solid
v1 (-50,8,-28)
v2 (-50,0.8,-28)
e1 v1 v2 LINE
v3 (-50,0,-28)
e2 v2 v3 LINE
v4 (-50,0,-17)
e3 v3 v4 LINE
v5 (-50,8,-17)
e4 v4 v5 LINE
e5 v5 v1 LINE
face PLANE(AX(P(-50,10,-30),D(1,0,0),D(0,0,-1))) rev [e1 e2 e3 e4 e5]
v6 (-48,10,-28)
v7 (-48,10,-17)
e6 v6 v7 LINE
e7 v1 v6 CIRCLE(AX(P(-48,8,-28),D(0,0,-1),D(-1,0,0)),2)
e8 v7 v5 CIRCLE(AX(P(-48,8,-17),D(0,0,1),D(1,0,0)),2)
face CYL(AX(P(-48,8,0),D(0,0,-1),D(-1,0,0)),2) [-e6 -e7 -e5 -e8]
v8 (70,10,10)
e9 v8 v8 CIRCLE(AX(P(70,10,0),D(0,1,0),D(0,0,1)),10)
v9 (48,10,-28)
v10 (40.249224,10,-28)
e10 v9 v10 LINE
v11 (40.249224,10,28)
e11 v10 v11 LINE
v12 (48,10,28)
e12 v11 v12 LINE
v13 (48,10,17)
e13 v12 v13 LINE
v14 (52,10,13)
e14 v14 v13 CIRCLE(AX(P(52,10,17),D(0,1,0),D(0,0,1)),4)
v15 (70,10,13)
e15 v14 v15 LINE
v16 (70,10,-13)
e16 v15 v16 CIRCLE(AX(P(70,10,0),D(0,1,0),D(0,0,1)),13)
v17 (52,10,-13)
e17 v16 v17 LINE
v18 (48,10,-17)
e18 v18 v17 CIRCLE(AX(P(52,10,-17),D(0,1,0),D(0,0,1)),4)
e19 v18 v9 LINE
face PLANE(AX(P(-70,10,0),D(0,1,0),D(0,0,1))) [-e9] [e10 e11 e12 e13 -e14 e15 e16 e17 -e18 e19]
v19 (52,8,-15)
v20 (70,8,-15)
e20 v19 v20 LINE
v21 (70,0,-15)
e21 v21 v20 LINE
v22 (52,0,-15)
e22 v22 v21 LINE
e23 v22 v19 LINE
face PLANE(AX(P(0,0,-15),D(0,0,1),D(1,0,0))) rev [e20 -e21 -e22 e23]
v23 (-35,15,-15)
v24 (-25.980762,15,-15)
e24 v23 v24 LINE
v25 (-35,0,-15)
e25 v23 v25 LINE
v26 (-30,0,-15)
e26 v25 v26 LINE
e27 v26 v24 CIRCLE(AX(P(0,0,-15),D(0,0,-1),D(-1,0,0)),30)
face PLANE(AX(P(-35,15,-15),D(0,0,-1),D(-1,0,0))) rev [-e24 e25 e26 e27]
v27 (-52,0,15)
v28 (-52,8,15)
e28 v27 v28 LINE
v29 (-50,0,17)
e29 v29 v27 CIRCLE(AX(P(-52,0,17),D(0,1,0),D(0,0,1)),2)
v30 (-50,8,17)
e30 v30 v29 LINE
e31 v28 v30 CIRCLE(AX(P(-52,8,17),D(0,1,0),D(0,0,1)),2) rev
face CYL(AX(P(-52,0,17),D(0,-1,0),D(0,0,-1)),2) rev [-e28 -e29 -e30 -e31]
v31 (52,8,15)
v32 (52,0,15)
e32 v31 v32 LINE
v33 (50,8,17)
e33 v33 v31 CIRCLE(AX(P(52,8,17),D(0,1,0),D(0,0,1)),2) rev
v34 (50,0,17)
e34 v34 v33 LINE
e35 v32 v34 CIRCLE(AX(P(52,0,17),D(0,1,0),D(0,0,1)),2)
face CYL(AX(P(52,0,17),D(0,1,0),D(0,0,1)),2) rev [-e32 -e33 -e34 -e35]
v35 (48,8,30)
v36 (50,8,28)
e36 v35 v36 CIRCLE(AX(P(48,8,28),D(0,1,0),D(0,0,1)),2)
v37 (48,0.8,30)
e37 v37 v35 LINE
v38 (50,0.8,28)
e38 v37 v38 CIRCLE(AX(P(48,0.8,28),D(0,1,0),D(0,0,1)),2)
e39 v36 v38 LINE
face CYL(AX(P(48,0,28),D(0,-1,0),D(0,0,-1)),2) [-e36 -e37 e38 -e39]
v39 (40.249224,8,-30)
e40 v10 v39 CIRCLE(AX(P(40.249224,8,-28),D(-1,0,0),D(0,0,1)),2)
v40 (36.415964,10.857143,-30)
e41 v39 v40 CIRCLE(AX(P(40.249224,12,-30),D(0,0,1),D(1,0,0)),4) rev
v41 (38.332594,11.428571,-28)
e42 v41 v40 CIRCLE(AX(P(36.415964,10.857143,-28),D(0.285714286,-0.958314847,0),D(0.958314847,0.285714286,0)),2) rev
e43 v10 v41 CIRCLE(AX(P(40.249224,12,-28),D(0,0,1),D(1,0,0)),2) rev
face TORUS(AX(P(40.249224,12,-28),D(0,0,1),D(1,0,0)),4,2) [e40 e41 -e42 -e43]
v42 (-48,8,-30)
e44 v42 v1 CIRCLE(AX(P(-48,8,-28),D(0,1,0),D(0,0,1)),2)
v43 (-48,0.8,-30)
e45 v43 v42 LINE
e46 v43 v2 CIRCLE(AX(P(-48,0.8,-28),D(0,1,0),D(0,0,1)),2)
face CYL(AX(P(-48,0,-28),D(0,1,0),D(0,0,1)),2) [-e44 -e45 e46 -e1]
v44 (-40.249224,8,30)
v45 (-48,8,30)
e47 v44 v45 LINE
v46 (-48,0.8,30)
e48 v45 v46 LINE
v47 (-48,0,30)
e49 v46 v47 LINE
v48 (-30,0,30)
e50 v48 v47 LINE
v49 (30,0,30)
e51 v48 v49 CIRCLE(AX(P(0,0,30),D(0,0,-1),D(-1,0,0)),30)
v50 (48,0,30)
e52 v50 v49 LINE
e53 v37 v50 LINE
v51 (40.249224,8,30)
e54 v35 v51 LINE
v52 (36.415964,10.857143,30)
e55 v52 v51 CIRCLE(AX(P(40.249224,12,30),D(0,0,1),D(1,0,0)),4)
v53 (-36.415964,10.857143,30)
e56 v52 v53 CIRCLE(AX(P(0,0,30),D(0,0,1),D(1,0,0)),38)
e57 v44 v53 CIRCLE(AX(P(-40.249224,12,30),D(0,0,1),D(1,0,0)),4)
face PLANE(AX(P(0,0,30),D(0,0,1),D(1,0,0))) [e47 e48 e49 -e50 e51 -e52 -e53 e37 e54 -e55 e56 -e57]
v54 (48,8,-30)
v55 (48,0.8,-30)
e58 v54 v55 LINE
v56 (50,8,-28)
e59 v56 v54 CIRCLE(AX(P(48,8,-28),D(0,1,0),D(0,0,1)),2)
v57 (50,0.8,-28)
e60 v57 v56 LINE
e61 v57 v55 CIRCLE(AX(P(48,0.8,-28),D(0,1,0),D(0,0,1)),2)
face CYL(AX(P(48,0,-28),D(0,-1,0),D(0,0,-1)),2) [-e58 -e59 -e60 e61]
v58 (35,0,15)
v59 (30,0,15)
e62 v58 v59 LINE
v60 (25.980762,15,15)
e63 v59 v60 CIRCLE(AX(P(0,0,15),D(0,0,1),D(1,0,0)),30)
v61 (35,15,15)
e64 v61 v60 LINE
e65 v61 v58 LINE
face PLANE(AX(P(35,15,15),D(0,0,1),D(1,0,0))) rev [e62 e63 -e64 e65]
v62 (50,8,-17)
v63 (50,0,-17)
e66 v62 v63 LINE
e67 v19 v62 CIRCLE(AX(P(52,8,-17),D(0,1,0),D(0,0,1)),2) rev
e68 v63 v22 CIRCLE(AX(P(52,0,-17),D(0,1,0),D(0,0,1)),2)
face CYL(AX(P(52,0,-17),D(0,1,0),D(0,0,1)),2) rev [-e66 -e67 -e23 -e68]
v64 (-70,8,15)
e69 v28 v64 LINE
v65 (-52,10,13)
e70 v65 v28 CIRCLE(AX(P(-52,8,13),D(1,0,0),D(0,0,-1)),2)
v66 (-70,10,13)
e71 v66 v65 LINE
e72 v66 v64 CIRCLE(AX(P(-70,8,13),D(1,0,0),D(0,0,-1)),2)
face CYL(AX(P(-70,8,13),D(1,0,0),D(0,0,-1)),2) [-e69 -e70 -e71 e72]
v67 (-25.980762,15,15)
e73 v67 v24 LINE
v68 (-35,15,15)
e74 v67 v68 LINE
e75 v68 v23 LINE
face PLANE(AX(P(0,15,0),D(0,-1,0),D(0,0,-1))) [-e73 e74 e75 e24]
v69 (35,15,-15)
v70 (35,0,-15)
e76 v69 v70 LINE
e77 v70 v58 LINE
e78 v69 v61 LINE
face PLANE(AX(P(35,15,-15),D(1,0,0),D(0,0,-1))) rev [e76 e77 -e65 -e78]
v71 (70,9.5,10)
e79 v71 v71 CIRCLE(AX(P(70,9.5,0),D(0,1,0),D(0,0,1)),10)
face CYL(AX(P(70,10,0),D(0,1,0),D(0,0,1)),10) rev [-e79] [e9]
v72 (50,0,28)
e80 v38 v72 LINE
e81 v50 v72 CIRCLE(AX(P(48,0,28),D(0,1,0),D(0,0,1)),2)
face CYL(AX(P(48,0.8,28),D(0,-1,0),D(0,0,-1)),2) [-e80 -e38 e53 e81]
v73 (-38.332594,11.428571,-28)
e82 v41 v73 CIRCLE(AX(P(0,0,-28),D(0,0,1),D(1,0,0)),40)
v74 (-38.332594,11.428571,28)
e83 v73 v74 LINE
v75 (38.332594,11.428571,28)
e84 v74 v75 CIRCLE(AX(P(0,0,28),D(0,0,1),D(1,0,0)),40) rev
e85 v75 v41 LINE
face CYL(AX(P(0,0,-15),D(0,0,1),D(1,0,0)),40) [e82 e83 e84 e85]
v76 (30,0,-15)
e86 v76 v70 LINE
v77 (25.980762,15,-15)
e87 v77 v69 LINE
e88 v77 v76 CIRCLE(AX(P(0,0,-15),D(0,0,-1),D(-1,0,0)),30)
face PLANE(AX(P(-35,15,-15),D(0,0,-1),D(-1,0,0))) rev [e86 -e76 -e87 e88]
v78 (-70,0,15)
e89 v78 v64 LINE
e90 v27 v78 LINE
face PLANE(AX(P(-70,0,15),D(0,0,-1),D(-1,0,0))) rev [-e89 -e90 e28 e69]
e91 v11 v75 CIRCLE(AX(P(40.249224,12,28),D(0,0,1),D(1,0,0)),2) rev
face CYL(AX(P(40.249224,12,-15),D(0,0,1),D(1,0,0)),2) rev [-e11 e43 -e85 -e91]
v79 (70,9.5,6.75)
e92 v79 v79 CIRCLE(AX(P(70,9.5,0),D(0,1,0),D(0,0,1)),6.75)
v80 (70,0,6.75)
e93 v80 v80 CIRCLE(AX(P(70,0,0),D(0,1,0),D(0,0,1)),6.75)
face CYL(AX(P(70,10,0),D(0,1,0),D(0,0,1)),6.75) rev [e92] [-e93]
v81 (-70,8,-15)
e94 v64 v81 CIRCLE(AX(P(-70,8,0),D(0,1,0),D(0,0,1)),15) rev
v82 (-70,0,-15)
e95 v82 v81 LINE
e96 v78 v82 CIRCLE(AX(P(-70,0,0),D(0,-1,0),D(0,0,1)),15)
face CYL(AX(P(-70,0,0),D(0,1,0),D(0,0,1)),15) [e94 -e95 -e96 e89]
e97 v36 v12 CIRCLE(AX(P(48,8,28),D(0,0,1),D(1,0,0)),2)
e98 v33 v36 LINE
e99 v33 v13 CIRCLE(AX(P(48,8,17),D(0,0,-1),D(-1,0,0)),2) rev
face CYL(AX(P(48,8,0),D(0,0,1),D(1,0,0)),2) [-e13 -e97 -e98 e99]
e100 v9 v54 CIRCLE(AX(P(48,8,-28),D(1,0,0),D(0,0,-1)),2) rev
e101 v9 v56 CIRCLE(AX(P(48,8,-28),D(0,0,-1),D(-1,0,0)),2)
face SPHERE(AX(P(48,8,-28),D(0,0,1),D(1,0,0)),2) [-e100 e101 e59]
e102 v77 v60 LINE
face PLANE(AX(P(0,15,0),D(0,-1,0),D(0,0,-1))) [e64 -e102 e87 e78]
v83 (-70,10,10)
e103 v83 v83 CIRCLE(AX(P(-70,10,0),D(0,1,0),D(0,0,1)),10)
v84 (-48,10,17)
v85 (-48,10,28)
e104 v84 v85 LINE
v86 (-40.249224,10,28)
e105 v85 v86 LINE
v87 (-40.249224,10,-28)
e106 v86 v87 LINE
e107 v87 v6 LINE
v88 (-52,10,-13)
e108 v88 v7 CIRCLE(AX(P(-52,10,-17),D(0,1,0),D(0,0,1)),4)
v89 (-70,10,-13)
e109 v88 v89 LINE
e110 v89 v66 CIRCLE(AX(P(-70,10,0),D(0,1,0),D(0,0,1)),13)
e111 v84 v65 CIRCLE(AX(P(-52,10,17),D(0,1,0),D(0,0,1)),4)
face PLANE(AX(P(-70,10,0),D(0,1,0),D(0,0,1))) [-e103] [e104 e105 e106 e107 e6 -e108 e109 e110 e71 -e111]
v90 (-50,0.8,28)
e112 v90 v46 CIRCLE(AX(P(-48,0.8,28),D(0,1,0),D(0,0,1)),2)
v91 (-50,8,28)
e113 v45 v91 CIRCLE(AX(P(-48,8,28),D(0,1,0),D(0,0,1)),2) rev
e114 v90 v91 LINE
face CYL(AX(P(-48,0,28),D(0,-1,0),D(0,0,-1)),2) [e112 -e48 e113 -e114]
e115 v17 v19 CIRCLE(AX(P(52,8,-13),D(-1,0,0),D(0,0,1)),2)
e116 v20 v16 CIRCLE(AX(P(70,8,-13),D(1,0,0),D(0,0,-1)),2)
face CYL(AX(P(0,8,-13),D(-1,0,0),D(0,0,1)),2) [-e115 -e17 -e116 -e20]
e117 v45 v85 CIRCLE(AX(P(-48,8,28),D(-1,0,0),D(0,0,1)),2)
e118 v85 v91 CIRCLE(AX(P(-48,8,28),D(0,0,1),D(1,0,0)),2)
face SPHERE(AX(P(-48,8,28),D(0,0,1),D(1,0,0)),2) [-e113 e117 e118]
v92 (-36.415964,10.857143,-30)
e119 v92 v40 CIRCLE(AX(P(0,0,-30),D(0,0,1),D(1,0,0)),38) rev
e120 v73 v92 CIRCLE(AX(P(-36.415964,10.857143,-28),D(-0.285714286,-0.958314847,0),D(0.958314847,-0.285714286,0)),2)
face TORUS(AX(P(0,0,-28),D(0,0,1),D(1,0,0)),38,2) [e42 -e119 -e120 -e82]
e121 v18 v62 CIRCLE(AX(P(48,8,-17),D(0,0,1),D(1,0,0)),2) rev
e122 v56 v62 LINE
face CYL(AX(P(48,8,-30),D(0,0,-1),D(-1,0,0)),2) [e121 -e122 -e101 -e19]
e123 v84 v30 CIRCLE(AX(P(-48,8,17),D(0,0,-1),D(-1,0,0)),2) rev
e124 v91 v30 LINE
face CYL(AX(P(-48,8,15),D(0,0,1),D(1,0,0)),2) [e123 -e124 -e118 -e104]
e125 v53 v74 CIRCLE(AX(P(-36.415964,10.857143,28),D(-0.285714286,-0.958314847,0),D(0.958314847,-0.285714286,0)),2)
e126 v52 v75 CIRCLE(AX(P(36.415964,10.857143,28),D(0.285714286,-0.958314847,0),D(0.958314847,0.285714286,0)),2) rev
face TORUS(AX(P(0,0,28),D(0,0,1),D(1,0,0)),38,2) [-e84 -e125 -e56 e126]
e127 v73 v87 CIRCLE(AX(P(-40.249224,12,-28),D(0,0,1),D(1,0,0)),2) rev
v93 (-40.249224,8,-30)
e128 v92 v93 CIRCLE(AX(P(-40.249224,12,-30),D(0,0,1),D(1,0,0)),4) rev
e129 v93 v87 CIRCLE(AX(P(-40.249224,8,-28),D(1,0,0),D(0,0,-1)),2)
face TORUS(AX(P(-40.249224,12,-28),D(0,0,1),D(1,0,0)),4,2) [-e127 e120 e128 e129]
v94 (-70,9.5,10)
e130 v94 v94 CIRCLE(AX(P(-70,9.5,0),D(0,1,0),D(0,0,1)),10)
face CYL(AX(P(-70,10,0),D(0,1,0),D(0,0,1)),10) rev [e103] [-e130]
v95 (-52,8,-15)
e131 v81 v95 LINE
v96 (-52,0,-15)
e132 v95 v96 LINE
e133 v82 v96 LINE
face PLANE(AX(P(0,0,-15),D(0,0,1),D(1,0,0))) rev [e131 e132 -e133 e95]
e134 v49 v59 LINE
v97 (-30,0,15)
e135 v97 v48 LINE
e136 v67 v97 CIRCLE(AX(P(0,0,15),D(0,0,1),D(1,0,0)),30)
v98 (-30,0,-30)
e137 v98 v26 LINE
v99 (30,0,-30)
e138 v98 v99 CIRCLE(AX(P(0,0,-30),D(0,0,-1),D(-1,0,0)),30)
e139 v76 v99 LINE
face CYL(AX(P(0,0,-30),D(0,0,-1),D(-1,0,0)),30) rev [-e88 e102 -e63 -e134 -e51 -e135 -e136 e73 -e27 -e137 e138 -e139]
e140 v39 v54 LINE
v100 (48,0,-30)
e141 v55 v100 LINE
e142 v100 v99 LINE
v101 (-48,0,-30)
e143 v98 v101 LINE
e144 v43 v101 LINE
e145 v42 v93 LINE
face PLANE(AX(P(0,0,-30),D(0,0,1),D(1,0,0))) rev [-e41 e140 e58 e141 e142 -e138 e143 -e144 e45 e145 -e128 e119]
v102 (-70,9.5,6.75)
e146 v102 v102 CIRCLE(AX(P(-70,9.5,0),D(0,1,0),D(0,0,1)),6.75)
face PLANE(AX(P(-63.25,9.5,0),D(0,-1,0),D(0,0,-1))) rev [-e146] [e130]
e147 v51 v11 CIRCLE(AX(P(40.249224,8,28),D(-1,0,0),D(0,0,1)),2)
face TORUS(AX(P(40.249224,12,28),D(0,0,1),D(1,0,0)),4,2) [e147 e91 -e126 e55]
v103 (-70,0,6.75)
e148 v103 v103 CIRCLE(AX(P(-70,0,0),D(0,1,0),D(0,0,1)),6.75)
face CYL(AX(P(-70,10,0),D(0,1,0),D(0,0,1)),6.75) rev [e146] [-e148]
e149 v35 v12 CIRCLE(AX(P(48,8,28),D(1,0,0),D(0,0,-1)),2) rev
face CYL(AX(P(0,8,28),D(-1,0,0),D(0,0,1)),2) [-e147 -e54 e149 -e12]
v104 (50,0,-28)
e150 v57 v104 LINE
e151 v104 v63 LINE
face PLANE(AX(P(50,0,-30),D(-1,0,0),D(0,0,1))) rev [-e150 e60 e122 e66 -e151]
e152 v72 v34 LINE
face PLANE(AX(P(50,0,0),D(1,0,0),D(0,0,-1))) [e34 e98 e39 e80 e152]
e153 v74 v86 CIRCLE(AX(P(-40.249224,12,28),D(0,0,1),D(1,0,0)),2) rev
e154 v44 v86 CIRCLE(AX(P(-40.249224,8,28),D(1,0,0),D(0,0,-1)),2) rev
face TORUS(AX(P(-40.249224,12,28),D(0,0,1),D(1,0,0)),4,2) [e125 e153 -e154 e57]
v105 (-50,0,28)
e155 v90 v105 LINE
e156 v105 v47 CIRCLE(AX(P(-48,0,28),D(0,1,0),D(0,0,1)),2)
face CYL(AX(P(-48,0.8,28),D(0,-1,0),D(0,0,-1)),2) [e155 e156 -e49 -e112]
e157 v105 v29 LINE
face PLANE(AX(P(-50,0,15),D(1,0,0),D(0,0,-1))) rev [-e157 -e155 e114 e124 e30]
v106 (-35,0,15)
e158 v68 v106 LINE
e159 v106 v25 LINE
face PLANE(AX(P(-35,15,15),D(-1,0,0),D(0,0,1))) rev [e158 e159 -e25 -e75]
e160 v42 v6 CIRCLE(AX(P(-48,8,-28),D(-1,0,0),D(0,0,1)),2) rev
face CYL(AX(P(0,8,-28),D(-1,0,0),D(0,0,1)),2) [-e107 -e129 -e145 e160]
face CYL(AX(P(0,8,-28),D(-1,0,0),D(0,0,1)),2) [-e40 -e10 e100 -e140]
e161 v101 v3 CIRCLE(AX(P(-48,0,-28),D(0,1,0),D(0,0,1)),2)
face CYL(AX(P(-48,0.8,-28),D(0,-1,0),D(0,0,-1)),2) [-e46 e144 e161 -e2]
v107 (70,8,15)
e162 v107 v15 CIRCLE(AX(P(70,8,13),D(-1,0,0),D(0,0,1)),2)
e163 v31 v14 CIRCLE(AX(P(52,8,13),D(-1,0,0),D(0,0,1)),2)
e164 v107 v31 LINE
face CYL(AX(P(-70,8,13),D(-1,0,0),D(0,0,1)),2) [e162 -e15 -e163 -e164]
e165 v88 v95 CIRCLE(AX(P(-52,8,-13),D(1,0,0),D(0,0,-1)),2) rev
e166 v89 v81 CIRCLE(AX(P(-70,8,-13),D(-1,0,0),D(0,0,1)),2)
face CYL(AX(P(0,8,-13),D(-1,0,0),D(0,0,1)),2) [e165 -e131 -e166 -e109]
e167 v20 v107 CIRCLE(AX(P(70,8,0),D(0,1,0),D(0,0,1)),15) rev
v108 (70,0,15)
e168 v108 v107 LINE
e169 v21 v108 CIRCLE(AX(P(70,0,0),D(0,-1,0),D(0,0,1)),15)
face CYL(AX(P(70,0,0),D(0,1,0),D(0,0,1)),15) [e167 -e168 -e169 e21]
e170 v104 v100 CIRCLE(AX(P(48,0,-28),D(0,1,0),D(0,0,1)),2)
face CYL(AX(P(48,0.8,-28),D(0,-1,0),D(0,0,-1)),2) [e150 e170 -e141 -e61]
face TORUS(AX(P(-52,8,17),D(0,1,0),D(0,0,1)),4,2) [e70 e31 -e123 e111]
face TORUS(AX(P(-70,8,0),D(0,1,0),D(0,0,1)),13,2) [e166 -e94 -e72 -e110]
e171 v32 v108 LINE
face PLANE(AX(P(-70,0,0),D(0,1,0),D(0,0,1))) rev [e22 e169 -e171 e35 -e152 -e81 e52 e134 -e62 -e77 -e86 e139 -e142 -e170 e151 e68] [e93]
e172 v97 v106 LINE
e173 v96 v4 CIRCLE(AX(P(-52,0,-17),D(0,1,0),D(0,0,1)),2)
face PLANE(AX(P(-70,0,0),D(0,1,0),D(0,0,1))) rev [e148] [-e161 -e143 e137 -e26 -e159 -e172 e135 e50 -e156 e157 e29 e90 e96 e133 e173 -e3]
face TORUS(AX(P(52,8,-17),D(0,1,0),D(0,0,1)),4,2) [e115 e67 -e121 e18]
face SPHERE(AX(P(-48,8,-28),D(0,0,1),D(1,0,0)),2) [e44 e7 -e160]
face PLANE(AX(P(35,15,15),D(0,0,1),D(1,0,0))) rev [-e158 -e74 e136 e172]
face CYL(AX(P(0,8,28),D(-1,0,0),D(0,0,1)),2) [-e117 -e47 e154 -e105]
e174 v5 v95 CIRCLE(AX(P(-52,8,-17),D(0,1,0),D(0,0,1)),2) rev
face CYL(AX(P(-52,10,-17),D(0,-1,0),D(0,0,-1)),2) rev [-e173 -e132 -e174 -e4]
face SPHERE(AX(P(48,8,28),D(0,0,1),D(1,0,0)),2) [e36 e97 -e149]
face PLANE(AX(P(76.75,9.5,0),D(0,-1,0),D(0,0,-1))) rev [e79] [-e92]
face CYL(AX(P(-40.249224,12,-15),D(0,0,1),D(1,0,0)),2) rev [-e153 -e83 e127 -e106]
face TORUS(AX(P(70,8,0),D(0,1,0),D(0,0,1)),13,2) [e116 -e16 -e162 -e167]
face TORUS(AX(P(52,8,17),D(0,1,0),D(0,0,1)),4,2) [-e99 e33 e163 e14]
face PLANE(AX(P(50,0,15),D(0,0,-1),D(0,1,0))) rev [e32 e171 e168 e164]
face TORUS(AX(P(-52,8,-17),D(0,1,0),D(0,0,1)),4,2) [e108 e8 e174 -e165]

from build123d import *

# Parameters (mm, degrees)
EXTRUDE_1_DEPTH               = 45
EXTRUDE_2_DEPTH               = 10
SKETCH_3_W                    = 15
SKETCH_3_H                    = 10
CUT_EXTRUDE_1_DEPTH           = 20.000000002
EXTRUDE_3_DEPTH               = 15
CUT_EXTRUDE_2_DEPTH           = 0.8
CUT_EXTRUDE_3_DEPTH           = 0.8
CUT_EXTRUDE_4_DEPTH           = 0.8
CUT_EXTRUDE_5_DEPTH           = 0.8
SKETCH_9_W                    = 70.000000048
SKETCH_9_H                    = 30
CUT_EXTRUDE_6_DEPTH           = 15
HOLE_WIZARD_M52_1_D           = 60
HOLE_WIZARD_M12_1_D           = 13.5
HOLE_WIZARD_M12_1_CBORE_D     = 20
HOLE_WIZARD_M12_1_CBORE_DEPTH = 0.5
FILLET_1_R                    = 2


with BuildPart() as part:
    # 草图1 → 凸台-拉伸1 (new body)
    with BuildSketch(Plane.XY.offset(30)):
        with BuildLine():
            Line((-38.729833462, 10), (38.729833462, 10))
            ThreePointArc((38.729833462, 10), (0, 40), (-38.729833462, 10))
        make_face()
    extrude(amount=-EXTRUDE_1_DEPTH)

    # 草图2 → 凸台-拉伸2 (add)
    with BuildSketch(Plane.XZ.offset(-10)):
        with BuildLine():
            Line((-70, 15), (-50, 15))
            Line((-50, 15), (-50, 30))
            Line((-50, 30), (70, 30))
            Line((70, 30), (70, 15))
            ThreePointArc((70, 15), (85, 0), (70, -15))
            Line((70, -15), (-70, -15))
            ThreePointArc((-70, -15), (-85, 0), (-70, 15))
        make_face()
    extrude(amount=EXTRUDE_2_DEPTH)

    # 草图3 → 切除-拉伸1 (cut)
    with BuildSketch(Plane(origin=(70, 0, 0), x_dir=(0, 0, -1), z_dir=(1, 0, 0))):
        with Locations((-22.5, 5)):
            Rectangle(SKETCH_3_W, SKETCH_3_H)
    extrude(amount=-CUT_EXTRUDE_1_DEPTH, mode=Mode.SUBTRACT)

    # 草图4 → 凸台-拉伸3 (add)
    with BuildSketch(Plane(origin=(0, 0, -15), x_dir=(-1, 0, 0), z_dir=(0, 0, -1))):
        with BuildLine():
            Line((-50, 0), (-50, 10))
            Line((-50, 10), (-38.729833462, 10))
            ThreePointArc((-38.729833462, 10), (0, 40), (38.729833462, 10))
            Line((38.729833462, 10), (50, 10))
            Line((50, 10), (50, 0))
            Line((50, 0), (-50, 0))
        make_face()
    extrude(amount=EXTRUDE_3_DEPTH)

    # 草图5 → 切除-拉伸2 (cut)
    with BuildSketch(Plane.XZ):
        with BuildLine():
            Line((49.999999992, 28), (49.999999992, 29.999999996))
            Line((49.999999992, 29.999999996), (47.999999996, 29.999999996))
            ThreePointArc((47.999999996, 29.999999996), (49.414213556, 29.41421356), (49.999999992, 28))
        make_face()
    extrude(amount=-CUT_EXTRUDE_2_DEPTH, mode=Mode.SUBTRACT)

    # 草图6 → 切除-拉伸3 (cut)
    with BuildSketch(Plane.XZ):
        with BuildLine():
            Line((-48.000000004, 29.999999996), (-50, 29.999999996))
            Line((-50, 29.999999996), (-50, 28))
            ThreePointArc((-50, 28), (-49.414213564, 29.41421356), (-48.000000004, 29.999999996))
        make_face()
    extrude(amount=-CUT_EXTRUDE_3_DEPTH, mode=Mode.SUBTRACT)

    # 草图7 → 切除-拉伸4 (cut)
    with BuildSketch(Plane.XZ):
        with BuildLine():
            Line((48, -30), (49.999999996, -30))
            Line((49.999999996, -30), (49.999999996, -28.000000004))
            ThreePointArc((49.999999996, -28.000000004), (49.41421356, -29.414213564), (48, -30))
        make_face()
    extrude(amount=-CUT_EXTRUDE_4_DEPTH, mode=Mode.SUBTRACT)

    # 草图8 → 切除-拉伸5 (cut)
    with BuildSketch(Plane.XZ):
        with BuildLine():
            Line((-49.999999996, -28.000000004), (-49.999999996, -30))
            Line((-49.999999996, -30), (-48, -30))
            ThreePointArc((-48, -30), (-49.41421356, -29.414213564), (-49.999999996, -28.000000004))
        make_face()
    extrude(amount=-CUT_EXTRUDE_5_DEPTH, mode=Mode.SUBTRACT)

    # 草图9 → 切除-拉伸6 (cut)
    with BuildSketch(Plane.XZ):
        Rectangle(SKETCH_9_W, SKETCH_9_H)
    extrude(amount=-CUT_EXTRUDE_6_DEPTH, mode=Mode.SUBTRACT)

    # M52 间隙孔1 (through all)
    with Locations(Plane(origin=(0, 0, -30), x_dir=(-1, 0, 0), z_dir=(0, 0, -1))):
        with Locations((0, 0)):
            Hole(HOLE_WIZARD_M52_1_D / 2)

    # M12 六角头螺栓的柱形沉头孔1 (through all)
    with Locations(Plane(origin=(0, 10, 0), x_dir=(1, 0, 0), z_dir=(0, 1, 0))):
        with Locations((-70, 0), (70, 0)):
            CounterBoreHole(HOLE_WIZARD_M12_1_D / 2, HOLE_WIZARD_M12_1_CBORE_D / 2, HOLE_WIZARD_M12_1_CBORE_DEPTH)

    # 圆角1
    fillet_1_edges = [part.edges().sort_by_distance(p)[0] for p in [
        (-50, 5.4, 30),
        (-50, 10, 22.5),
        (-60, 10, 15),
        (-85, 10, 0),
        (-60, 10, -15),
        (-50, 10, -22.5),
        (-50, 5.4, -30),
        (-44.364916731, 10, 30),
        (38.729833462, 10, 0),
        (-38.729833462, 10, 0),
        (0, 40, 30),
        (44.36491673, 10, 30),
        (-44.364916731, 10, -30),
        (0, 40, -30),
        (44.364916731, 10, -30),
        (49.999999998, 5.4, 30),
        (50, 5.4, -30),
        (49.999999998, 10, 22.5),
        (59.999999999, 10, 15),
        (85, 10, 0),
        (50, 10, -22.5),
        (60, 10, -15),
        (50, 5, -15),
        (-50, 5, -15),
        (-50, 5, 15),
        (49.999999998, 5, 15),
    ]]
    fillet(fillet_1_edges, radius=FILLET_1_R - 0.0001)  # a hair under: the kernel refuses the full size


solid = part.part
